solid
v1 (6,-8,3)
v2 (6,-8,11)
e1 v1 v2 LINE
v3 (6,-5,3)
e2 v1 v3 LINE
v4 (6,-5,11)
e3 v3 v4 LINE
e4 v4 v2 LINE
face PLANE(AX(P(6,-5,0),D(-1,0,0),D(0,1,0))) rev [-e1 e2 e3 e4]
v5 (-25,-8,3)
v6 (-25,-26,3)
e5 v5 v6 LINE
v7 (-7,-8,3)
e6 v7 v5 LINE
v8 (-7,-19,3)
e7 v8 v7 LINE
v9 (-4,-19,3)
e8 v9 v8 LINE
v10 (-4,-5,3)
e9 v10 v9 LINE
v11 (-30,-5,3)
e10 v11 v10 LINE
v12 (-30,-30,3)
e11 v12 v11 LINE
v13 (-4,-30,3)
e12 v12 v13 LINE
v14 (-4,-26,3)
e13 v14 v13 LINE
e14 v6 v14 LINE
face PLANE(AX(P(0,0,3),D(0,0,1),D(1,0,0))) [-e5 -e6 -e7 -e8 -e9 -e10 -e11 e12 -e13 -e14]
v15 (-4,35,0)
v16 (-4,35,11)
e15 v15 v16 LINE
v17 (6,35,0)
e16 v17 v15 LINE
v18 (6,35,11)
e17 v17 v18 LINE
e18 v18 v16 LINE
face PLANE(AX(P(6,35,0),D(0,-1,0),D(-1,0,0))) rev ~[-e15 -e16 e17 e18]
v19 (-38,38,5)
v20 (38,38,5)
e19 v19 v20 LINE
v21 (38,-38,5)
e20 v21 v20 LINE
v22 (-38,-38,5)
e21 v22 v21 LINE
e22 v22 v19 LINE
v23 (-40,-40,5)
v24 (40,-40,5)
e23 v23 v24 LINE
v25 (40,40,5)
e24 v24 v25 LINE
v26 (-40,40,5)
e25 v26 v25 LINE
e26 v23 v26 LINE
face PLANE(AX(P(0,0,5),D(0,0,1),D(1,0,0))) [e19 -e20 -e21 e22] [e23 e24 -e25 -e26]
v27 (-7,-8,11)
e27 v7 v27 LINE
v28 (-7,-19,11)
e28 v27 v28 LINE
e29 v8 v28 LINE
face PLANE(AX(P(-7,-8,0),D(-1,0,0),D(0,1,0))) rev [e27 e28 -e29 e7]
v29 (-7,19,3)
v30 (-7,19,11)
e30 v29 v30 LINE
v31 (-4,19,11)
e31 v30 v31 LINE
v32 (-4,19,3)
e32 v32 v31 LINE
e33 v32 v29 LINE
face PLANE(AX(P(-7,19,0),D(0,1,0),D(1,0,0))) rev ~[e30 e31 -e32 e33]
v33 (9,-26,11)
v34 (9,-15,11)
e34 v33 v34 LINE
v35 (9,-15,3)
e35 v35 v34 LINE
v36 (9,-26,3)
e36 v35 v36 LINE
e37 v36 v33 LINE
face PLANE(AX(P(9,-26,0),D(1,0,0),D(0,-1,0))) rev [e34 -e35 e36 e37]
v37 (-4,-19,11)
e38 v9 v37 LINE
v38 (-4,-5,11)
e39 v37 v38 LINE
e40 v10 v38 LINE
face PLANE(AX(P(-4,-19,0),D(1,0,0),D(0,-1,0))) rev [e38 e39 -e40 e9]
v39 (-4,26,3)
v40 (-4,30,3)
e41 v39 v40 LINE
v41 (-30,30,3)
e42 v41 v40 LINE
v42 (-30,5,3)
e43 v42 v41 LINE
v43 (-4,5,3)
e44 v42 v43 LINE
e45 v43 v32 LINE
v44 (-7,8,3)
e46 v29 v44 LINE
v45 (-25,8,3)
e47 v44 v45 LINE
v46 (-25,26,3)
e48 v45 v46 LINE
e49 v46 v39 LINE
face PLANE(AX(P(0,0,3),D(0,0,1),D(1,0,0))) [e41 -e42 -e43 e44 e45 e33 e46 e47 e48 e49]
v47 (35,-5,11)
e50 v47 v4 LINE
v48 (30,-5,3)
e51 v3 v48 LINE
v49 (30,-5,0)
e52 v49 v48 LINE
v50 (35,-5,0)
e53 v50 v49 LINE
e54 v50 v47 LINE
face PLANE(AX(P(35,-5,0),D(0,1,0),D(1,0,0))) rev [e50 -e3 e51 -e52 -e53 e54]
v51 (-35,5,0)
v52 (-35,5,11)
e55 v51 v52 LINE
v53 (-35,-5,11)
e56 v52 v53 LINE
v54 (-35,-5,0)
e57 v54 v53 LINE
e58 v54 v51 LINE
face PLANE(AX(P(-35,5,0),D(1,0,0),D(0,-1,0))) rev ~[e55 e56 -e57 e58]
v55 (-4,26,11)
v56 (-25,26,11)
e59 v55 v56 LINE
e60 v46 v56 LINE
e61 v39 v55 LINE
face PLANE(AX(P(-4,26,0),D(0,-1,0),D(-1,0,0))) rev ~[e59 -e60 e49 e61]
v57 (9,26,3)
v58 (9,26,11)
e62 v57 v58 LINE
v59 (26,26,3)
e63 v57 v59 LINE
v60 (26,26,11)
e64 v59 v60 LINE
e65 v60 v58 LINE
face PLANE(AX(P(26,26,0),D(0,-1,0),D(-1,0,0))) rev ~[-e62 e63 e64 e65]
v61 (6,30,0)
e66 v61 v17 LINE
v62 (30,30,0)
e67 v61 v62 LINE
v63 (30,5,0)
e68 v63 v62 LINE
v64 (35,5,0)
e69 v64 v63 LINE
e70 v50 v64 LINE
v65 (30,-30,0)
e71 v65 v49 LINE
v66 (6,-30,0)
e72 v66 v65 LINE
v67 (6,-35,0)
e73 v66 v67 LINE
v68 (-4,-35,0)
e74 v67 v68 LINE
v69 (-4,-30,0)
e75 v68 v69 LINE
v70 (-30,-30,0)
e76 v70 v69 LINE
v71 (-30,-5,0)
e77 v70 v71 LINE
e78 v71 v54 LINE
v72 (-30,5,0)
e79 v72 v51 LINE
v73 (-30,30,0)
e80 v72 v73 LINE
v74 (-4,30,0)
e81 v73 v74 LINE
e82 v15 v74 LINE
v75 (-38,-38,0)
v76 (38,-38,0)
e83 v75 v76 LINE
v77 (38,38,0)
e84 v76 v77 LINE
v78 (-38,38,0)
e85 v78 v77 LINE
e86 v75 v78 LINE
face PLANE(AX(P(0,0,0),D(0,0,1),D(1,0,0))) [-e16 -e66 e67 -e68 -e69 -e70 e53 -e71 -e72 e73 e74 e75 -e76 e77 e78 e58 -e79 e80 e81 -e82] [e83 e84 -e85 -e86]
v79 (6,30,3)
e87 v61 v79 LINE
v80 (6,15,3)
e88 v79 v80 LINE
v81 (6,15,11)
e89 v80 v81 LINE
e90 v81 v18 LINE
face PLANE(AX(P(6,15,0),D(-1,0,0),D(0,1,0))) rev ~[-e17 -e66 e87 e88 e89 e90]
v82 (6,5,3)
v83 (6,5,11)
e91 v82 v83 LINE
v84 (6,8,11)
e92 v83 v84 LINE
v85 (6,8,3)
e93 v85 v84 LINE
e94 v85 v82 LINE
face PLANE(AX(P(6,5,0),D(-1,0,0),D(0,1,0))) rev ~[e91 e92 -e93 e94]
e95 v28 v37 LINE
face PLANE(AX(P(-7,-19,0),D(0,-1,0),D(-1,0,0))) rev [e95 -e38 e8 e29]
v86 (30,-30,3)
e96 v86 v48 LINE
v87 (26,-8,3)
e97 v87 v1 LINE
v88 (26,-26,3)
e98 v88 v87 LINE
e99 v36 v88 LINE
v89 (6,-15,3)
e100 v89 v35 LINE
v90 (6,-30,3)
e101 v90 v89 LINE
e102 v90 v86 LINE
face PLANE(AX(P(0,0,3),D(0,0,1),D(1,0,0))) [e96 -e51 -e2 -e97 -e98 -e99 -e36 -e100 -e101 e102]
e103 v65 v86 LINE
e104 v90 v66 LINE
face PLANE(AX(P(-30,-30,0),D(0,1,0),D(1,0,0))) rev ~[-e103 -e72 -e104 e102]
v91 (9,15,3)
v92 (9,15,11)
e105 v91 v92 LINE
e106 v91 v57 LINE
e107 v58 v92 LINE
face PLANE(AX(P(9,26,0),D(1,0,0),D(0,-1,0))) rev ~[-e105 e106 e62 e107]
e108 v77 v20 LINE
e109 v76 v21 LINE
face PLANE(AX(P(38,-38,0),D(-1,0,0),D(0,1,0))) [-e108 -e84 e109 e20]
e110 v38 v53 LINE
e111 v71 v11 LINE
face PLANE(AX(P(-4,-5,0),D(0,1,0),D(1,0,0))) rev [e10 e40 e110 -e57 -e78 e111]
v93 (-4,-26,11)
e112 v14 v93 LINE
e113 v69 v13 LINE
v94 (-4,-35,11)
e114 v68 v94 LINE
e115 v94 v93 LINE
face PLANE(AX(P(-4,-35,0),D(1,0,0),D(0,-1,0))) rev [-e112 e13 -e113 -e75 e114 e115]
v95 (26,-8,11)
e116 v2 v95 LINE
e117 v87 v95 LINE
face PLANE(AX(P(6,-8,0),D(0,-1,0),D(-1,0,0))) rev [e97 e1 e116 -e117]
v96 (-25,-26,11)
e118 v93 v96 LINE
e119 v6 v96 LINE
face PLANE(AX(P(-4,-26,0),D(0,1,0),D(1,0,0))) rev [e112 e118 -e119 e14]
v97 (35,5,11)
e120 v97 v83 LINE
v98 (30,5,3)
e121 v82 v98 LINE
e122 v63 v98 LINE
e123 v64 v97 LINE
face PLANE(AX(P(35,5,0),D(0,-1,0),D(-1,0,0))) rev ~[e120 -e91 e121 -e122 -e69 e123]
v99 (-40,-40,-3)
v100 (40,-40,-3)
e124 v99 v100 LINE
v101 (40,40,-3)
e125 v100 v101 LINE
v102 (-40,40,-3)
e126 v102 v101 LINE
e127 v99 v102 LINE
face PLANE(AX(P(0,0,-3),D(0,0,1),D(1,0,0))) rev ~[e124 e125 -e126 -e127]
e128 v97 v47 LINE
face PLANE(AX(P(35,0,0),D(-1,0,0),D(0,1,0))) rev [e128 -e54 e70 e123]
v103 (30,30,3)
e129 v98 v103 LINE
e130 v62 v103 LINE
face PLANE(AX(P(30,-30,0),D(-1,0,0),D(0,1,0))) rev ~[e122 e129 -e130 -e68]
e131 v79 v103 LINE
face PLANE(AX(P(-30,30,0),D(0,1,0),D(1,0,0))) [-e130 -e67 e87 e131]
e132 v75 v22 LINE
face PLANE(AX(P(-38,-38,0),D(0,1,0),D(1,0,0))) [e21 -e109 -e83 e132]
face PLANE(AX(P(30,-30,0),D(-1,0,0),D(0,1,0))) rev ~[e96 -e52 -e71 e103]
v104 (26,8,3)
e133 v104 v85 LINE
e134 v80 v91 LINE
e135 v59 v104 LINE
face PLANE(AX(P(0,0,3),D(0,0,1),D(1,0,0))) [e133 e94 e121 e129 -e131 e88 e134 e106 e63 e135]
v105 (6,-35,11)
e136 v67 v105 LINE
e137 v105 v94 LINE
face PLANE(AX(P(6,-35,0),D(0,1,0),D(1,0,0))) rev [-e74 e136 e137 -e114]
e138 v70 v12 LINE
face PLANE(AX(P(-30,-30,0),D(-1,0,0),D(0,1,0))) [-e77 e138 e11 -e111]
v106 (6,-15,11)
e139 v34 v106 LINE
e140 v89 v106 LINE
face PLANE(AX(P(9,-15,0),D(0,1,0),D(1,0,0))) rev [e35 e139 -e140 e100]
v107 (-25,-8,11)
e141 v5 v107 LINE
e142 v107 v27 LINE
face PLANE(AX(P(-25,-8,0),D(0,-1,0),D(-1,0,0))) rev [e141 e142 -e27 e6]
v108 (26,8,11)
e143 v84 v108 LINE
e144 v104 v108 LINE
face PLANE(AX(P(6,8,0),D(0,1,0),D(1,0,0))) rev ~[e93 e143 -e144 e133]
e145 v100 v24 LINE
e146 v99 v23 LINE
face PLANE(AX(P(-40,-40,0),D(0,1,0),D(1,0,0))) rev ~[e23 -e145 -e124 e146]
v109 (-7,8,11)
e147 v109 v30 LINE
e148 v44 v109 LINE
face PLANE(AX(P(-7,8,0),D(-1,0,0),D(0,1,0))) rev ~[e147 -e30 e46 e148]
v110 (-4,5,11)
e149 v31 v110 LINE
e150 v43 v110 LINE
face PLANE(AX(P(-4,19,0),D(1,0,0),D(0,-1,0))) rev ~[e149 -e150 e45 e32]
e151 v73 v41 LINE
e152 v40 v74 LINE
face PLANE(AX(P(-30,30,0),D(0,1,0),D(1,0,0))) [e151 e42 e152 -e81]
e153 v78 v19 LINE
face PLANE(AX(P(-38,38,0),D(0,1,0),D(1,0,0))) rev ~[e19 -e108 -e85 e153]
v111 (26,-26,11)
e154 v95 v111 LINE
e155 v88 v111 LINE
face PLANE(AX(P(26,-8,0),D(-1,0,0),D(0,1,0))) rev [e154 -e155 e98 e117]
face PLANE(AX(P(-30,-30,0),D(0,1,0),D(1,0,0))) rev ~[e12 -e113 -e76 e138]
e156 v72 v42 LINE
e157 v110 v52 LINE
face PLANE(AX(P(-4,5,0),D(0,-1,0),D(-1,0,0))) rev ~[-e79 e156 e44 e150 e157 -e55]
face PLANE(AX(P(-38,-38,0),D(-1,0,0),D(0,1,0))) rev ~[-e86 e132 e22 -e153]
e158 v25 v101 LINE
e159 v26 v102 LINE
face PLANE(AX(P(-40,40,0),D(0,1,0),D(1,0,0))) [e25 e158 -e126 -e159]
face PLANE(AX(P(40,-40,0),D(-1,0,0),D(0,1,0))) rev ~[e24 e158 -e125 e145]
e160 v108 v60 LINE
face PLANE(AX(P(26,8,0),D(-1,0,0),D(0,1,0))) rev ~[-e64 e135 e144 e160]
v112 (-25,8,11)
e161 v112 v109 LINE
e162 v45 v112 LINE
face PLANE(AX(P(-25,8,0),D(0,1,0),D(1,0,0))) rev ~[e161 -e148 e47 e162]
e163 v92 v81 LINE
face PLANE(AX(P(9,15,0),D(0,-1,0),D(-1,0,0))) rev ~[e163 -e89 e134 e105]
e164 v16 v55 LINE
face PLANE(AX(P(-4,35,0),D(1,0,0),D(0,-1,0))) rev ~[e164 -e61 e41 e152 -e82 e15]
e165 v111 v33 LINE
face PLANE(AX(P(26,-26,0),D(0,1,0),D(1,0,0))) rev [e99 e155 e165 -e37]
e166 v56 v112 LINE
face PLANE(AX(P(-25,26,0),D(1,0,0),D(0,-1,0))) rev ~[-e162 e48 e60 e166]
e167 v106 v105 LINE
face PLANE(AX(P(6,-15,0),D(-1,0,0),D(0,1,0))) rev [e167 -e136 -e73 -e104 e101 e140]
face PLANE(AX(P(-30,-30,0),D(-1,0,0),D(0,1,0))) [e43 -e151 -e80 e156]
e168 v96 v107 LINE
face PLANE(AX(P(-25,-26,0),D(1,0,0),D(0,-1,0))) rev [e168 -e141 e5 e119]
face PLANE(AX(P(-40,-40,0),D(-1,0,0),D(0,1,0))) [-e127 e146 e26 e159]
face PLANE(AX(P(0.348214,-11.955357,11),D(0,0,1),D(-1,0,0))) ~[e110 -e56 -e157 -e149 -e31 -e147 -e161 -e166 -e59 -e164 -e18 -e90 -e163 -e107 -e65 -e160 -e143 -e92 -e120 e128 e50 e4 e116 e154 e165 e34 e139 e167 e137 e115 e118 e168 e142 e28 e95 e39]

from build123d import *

# Parameters (mm, degrees)
F1_START = 3
F0_W     = 80
F0_H     = 80
F0_W_2   = 76
F0_H_2   = 76
F1_DEPTH = 51
F0_W_3   = 70
F0_H_3   = 70
F2_DEPTH = 3
F4_W     = 60
F4_H     = 60
F5_DEPTH = 3
F7_DEPTH = 5
F9_DEPTH = 11


# Not quite as in the source:
# - a pattern or mirror of a feature is missing from the dataset's text; its kind, count and spacing are read off the source's solid


with BuildPart() as f1:
    # F0 (on Top) → F1 (new body)
    with BuildSketch(Plane.XY.offset(F1_START)):
        Rectangle(F0_W, F0_H)
        Rectangle(F0_W_2, F0_H_2, mode=Mode.SUBTRACT)
    extrude(amount=F1_DEPTH)


with BuildPart() as f2:
    # F0 (on Top) → F2 (new body)
    with BuildSketch(Plane.XY):
        Rectangle(F0_W, F0_H)
        Rectangle(F0_W_2, F0_H_2, mode=Mode.SUBTRACT)
        Rectangle(F0_W_2, F0_H_2)
        Rectangle(F0_W_3, F0_H_3, mode=Mode.SUBTRACT)
        Rectangle(F0_W_3, F0_H_3)
    extrude(amount=-F2_DEPTH)

    # F4 (on Top) → F5 (join)
    with BuildSketch(Plane.XY):
        Rectangle(F4_W, F4_H)
    extrude(amount=F5_DEPTH)

    # F0 (on Top) → F7 (join)
    with BuildSketch(Plane.XY):
        Rectangle(F0_W, F0_H)
        Rectangle(F0_W_2, F0_H_2, mode=Mode.SUBTRACT)
    extrude(amount=F7_DEPTH)

    # F8 (on Top) → F9 (join)
    with BuildSketch(Plane.XY):
        Polygon((-35, 0), (35, 0), (35, 5), (6, 5), (6, 8), (26, 8), (26, 26), (9, 26), (9, 15), (6, 15), (6, 35), (-4, 35), (-4, 26), (-25, 26), (-25, 8), (-7, 8), (-7, 19), (-4, 19), (-4, 5), (-35, 5), align=None)
    f9 = extrude(amount=F9_DEPTH)

    # F9_copies: F9 across plane
    add(f9.mirror(Plane(origin=(0, 0, 0), x_dir=(0, 0, -1), z_dir=(0, -1, 0))))


solid = f2.part
